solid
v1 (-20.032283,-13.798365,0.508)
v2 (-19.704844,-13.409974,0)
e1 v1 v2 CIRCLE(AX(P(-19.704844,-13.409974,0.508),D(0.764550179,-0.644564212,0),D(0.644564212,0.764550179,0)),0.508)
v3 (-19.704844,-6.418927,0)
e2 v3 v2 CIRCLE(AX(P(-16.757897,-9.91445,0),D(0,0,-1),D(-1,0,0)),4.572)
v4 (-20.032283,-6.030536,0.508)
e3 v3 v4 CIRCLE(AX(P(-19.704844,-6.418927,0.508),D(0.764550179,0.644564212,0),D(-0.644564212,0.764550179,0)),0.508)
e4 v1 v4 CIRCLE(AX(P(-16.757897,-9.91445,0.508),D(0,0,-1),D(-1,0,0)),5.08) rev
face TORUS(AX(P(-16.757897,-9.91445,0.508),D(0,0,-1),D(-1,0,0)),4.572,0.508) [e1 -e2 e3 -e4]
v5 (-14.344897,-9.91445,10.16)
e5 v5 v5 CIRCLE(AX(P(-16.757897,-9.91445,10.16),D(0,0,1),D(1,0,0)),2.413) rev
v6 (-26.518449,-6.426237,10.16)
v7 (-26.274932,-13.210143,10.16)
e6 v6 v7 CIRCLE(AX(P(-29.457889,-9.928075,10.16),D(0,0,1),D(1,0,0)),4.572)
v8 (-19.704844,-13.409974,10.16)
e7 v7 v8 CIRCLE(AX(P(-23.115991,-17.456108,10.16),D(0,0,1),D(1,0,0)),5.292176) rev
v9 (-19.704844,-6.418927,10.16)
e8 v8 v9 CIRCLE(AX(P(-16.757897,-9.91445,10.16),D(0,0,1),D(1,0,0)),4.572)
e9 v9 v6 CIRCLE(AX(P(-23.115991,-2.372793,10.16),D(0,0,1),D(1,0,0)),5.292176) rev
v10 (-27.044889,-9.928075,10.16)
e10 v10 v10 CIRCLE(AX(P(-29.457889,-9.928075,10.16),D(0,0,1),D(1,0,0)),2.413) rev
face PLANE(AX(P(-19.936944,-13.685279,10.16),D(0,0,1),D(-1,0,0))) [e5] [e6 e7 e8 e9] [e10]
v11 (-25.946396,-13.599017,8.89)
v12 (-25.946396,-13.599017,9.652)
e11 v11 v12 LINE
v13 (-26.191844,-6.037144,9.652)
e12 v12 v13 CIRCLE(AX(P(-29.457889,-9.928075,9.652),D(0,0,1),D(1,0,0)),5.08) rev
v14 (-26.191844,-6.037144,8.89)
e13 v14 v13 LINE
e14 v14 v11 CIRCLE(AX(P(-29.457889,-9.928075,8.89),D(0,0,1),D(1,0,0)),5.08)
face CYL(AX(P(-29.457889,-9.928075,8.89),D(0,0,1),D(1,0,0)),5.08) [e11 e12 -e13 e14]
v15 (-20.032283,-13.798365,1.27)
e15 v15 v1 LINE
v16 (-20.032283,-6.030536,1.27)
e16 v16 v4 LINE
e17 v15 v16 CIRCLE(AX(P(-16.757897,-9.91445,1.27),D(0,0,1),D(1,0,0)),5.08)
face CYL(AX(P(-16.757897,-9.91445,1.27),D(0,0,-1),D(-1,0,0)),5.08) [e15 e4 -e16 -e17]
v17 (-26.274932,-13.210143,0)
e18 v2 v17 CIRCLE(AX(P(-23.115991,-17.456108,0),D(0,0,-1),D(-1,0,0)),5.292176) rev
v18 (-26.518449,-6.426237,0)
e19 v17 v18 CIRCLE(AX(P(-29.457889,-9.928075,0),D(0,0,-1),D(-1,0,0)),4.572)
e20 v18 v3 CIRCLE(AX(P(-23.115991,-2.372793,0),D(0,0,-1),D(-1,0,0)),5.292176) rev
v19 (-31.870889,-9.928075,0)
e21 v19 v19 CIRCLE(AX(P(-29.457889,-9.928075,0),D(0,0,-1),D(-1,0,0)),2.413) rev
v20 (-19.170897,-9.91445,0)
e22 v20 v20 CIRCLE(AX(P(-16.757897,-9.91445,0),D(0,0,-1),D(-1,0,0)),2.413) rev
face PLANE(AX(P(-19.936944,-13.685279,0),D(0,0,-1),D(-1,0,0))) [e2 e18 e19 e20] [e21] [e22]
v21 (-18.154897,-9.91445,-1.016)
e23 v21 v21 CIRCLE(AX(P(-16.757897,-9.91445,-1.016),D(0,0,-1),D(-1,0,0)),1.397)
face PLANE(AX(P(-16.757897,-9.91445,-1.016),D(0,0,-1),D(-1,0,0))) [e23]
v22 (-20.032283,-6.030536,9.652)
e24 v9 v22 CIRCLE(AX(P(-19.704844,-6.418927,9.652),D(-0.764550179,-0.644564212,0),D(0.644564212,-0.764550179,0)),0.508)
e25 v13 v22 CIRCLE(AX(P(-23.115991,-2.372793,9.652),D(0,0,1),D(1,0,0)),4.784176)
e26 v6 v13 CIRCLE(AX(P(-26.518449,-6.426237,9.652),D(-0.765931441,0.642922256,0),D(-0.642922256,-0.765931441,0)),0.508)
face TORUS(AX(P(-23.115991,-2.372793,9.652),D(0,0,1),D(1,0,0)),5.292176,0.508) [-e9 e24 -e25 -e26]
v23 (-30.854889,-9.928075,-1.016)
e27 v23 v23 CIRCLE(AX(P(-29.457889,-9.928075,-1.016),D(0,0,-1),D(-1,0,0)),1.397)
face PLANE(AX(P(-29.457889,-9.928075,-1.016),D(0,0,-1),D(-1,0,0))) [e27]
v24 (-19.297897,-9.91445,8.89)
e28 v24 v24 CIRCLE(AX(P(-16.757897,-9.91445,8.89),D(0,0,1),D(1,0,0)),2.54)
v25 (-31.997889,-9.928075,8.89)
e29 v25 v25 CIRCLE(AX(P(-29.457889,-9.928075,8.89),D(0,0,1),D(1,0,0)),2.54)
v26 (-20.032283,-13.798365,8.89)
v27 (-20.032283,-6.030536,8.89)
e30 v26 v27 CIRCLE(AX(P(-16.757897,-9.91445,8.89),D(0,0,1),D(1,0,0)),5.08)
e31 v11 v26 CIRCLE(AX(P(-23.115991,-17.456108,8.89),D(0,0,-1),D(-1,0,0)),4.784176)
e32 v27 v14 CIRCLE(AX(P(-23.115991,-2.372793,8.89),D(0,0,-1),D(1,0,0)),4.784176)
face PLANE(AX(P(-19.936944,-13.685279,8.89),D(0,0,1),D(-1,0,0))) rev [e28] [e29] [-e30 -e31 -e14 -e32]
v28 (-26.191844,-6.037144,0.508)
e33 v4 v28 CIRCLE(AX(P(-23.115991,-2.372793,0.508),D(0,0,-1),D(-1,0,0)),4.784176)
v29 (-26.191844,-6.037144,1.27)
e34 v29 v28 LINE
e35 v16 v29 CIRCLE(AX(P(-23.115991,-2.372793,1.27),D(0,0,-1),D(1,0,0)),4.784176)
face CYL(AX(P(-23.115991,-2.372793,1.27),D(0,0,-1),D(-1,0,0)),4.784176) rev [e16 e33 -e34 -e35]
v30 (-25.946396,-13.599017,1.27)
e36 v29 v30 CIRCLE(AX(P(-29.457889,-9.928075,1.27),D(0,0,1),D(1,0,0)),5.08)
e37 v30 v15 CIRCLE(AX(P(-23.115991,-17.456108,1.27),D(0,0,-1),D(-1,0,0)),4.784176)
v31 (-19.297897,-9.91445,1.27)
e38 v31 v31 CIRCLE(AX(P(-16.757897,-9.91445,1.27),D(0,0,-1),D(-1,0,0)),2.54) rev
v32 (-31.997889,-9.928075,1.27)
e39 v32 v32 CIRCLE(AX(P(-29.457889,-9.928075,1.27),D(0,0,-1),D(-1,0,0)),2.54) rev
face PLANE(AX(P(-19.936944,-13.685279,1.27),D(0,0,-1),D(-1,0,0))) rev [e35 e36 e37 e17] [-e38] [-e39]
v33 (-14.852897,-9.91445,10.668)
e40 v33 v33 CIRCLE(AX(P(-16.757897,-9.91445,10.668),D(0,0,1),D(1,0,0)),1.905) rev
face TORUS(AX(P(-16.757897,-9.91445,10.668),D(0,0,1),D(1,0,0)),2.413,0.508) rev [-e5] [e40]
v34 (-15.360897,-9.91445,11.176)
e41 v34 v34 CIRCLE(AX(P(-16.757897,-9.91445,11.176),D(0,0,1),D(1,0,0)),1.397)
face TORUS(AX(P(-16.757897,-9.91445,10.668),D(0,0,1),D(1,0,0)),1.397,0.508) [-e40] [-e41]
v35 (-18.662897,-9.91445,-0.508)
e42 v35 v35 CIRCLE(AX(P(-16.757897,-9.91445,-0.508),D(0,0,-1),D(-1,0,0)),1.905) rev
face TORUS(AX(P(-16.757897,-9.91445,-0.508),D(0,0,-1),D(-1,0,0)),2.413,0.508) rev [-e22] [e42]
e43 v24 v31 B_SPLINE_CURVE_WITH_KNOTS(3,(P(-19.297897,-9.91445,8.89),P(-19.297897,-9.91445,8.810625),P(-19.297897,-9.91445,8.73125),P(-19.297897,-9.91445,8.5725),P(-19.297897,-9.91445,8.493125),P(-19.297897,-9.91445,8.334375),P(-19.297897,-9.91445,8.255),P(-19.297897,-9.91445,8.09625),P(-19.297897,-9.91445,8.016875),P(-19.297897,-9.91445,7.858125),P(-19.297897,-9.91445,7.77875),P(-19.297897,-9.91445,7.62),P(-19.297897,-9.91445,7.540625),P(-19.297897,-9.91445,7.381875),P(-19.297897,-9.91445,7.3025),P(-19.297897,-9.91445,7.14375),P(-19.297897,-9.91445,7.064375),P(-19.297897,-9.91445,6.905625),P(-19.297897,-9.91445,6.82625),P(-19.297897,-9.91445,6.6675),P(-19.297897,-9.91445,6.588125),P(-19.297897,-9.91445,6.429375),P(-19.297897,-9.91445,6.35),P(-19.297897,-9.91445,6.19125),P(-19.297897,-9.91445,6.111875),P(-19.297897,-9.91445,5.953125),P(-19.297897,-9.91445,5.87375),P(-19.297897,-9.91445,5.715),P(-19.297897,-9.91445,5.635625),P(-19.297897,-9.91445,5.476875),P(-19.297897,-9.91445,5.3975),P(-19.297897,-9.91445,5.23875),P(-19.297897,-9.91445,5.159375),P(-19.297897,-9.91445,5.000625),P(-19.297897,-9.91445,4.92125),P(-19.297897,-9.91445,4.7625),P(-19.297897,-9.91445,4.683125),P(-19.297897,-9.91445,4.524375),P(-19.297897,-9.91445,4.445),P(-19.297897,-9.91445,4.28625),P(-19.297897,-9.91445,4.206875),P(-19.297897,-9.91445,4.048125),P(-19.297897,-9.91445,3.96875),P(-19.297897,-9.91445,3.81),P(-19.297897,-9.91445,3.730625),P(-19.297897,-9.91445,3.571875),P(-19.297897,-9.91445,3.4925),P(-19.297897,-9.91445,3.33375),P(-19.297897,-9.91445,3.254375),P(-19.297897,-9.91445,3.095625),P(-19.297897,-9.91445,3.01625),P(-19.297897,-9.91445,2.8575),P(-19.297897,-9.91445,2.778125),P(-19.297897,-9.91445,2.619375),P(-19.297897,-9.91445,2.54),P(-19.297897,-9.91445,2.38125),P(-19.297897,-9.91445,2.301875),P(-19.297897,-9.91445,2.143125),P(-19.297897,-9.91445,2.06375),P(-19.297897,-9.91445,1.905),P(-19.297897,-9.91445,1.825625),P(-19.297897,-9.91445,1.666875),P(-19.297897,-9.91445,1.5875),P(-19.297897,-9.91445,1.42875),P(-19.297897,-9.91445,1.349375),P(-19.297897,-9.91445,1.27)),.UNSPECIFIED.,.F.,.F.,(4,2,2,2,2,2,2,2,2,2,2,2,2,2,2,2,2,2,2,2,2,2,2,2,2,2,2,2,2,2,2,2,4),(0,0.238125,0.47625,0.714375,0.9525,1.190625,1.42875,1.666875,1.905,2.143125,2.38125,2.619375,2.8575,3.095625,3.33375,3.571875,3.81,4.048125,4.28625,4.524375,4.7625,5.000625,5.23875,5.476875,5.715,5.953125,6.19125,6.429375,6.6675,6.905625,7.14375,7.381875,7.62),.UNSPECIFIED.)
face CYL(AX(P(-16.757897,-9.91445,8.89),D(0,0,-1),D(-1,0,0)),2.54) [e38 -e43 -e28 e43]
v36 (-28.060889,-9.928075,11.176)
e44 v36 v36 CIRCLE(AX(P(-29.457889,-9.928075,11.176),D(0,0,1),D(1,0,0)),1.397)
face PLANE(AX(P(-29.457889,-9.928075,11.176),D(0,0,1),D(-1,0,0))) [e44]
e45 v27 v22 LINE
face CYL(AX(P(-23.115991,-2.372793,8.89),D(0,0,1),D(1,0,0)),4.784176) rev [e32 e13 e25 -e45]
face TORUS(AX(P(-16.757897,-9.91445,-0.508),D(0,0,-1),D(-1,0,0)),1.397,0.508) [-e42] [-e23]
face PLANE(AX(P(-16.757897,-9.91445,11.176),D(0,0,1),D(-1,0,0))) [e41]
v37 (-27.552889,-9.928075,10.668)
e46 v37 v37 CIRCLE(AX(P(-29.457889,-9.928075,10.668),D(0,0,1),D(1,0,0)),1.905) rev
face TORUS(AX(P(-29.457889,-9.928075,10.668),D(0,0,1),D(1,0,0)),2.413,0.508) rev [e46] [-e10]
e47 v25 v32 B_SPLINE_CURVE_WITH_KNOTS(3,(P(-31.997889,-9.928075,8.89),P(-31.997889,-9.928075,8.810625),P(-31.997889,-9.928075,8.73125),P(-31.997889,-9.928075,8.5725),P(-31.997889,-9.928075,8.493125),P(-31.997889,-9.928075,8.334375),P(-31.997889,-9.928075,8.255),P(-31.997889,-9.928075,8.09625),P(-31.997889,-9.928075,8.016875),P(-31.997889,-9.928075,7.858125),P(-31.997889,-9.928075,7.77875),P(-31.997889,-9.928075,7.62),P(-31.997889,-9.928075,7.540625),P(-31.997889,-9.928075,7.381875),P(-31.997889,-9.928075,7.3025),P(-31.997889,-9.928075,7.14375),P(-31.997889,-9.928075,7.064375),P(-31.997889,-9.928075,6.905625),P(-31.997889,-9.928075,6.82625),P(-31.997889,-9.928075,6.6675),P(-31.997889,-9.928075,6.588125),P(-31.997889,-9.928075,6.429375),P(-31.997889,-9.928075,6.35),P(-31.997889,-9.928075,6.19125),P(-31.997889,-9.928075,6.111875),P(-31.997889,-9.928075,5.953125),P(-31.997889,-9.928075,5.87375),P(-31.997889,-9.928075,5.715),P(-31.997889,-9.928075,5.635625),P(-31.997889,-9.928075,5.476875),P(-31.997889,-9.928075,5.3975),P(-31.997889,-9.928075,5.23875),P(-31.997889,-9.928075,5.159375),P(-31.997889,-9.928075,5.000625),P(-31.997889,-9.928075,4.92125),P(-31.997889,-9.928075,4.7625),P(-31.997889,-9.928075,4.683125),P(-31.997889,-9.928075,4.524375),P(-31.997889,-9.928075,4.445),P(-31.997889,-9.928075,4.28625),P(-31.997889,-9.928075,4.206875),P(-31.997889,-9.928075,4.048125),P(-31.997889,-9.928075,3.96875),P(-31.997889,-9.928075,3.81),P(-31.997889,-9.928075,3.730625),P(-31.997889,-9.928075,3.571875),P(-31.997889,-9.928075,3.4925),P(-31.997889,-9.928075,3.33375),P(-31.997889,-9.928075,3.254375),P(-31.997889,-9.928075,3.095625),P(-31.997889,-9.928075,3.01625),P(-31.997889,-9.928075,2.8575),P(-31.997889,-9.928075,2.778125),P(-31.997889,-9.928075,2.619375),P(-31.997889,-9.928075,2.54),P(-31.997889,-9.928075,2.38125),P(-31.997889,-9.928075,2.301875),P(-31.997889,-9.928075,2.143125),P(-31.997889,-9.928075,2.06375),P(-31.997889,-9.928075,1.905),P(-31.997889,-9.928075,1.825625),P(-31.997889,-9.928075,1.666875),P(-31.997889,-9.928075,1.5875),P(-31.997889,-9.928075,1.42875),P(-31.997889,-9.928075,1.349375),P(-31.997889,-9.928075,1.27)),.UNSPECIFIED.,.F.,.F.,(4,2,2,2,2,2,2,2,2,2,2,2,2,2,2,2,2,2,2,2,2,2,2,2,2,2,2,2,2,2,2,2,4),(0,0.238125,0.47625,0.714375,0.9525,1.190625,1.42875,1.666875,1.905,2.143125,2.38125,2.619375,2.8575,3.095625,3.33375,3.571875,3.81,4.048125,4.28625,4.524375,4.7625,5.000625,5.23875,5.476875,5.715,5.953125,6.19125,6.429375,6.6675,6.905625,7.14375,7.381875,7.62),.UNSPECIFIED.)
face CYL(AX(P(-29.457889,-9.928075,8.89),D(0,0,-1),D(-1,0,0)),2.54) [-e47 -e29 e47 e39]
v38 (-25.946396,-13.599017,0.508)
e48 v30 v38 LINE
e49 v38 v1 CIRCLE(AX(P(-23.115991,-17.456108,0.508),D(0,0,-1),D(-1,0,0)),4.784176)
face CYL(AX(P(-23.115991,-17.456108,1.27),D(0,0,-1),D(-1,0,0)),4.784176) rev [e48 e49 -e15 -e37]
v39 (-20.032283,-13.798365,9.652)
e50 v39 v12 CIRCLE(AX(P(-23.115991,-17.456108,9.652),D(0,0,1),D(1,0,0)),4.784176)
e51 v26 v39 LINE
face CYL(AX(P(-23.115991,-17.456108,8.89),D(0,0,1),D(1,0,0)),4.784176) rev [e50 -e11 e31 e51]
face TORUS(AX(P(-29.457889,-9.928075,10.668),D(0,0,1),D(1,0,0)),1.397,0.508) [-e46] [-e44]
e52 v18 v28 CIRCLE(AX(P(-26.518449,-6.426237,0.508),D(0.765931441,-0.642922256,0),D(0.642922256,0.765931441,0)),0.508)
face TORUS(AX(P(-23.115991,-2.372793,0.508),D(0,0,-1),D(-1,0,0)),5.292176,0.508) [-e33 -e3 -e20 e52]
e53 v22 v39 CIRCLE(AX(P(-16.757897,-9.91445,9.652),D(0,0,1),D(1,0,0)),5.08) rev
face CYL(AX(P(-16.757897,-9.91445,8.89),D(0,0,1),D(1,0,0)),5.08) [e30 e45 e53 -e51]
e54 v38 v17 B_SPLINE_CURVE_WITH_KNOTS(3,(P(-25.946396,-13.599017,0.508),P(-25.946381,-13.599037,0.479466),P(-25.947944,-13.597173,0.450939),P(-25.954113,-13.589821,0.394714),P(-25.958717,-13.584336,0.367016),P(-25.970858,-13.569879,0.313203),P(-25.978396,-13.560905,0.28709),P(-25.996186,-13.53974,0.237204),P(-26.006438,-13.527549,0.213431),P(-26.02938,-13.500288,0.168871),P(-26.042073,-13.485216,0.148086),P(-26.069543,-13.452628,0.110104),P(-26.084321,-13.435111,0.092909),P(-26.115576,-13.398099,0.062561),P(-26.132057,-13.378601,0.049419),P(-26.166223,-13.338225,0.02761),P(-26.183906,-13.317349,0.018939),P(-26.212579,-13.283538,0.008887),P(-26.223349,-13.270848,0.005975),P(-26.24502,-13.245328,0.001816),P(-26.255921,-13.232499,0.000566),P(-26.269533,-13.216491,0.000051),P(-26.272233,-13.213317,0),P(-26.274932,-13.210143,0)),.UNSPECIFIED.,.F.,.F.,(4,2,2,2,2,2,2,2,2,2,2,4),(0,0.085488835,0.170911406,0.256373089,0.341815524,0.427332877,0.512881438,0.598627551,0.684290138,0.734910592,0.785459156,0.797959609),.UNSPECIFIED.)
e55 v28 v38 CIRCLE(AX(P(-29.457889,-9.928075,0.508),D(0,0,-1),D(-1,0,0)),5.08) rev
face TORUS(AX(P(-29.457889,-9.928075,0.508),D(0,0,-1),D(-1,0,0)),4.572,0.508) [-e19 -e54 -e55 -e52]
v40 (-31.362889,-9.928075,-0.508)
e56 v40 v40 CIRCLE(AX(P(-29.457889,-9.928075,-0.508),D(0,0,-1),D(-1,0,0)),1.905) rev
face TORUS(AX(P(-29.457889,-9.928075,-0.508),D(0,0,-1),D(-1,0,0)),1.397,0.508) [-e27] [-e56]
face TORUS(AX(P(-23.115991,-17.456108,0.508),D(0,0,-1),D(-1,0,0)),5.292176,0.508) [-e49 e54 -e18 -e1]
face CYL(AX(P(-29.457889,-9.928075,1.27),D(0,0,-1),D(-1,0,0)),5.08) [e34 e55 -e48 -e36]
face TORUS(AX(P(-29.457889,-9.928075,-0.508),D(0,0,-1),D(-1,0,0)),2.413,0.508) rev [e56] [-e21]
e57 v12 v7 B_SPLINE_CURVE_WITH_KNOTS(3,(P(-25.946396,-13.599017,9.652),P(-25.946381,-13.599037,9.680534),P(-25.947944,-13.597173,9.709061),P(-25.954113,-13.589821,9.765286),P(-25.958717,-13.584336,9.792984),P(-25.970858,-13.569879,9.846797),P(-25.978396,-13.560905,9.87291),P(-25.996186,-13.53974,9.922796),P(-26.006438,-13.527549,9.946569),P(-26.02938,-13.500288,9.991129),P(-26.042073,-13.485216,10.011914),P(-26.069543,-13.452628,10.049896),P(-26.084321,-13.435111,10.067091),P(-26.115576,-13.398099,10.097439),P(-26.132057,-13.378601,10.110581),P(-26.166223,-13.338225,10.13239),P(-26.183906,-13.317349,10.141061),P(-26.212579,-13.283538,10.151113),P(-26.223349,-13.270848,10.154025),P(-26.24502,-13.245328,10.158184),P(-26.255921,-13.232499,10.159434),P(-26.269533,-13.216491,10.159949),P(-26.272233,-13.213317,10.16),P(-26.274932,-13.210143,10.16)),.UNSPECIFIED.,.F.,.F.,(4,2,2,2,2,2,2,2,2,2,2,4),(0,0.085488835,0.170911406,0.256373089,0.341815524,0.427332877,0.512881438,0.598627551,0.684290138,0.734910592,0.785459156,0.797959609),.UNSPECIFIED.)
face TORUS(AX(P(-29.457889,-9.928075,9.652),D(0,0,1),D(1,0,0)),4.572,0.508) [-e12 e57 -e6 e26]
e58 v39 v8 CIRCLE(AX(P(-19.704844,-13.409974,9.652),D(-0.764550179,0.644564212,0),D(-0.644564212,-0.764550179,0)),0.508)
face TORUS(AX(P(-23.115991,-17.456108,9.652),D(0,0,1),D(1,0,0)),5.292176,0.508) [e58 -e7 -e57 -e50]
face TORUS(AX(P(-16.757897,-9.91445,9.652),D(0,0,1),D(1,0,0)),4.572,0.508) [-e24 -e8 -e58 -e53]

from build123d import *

# Parameters (mm, degrees)
BOSS_EXTRUDE1_DEPTH  = 1.27
SKETCH2_R            = 2.54
BOSS_EXTRUDE2_DEPTH  = 7.62
SKETCH3_R            = 1.905
BOSS_EXTRUDE3_DEPTH  = 1.016
FILLET1_R            = 0.508
FILLET2_R            = 0.508
FILLET1_OF_MIRROR3_R = 0.508
FILLET2_OF_MIRROR3_R = 0.508


with BuildPart() as part:
    # Sketch1 → Boss-Extrude1 (new body)
    with BuildSketch(Plane.XY):
        with BuildLine():
            ThreePointArc((-26.191844276, -6.037143701), (-34.535215397, -10.092878556), (-25.946396087, -13.599017422))
            ThreePointArc((-25.946396087, -13.599017422), (-22.954821865, -12.674647532), (-20.032282841, -13.798365326))
            ThreePointArc((-20.032282841, -13.798365326), (-11.677896645, -9.914450414), (-20.032282841, -6.030535502))
            ThreePointArc((-20.032282841, -6.030535502), (-23.110858628, -7.156966052), (-26.191844276, -6.037143701))
        make_face()
    boss_extrude1 = extrude(amount=BOSS_EXTRUDE1_DEPTH)

    # Sketch2 → Boss-Extrude2 (add)
    with BuildSketch(Plane.XY.offset(1.27)):
        with Locations(Location((-16.757896645, -9.914450414, 0), (0, 0, 180))):
            Circle(SKETCH2_R)
        with Locations(Location((-29.457889337, -9.928075423, 0), (0, 0, 180))):
            Circle(SKETCH2_R)
    extrude(amount=BOSS_EXTRUDE2_DEPTH)

    # Mirror1: Boss-Extrude1 across plane
    add(boss_extrude1.mirror(Plane.XY.offset(5.08)))

    # Sketch3 → Boss-Extrude3 (add)
    with BuildSketch(Plane(origin=(0, 0, 0), x_dir=(-1, 0, 0), z_dir=(0, 0, -1))):
        with Locations((29.457889337, -9.928075423)):
            Circle(SKETCH3_R)
        with Locations((16.757896645, -9.914450414)):
            Circle(SKETCH3_R)
    boss_extrude3 = extrude(amount=BOSS_EXTRUDE3_DEPTH)

    # Fillet1
    fillet1_edges = [part.edges().sort_by_distance(p)[0] for p in [
        (-27.552889337, -9.928075423, -1.016),
        (-14.852896645, -9.914450414, -1.016),
    ]]
    fillet(fillet1_edges, radius=FILLET1_R)

    # Fillet2
    fillet2_edges = [part.edges().sort_by_distance(p)[0] for p in [
        (-27.552889337, -9.928075423, 0),
    ]]
    fillet(fillet2_edges, radius=FILLET2_R - 0.0001)  # a hair under: the kernel refuses the full size
    fillet2_2_edges = [part.edges().sort_by_distance(p)[0] for p in [
        (-23.110858628, -7.156966052, 0),
        (-11.677896645, -9.914450414, 0),
        (-34.535215397, -10.092878556, 0),
        (-22.954821865, -12.674647532, 0),
    ]]
    fillet(fillet2_2_edges, radius=FILLET2_R)
    fillet2_3_edges = [part.edges().sort_by_distance(p)[0] for p in [
        (-14.852896645, -9.914450414, 0),
    ]]
    fillet(fillet2_3_edges, radius=FILLET2_R - 0.0001)  # a hair under: the kernel refuses the full size
    fillet2_4_edges = [part.edges().sort_by_distance(p)[0] for p in [
        (-23.110858628, -7.156966052, 10.16),
        (-11.677896645, -9.914450414, 10.16),
        (-34.535215397, -10.092878556, 10.16),
        (-22.954821865, -12.674647532, 10.16),
    ]]
    fillet(fillet2_4_edges, radius=FILLET2_R)

    # Mirror3: Boss-Extrude3 across plane
    add(boss_extrude3.mirror(Plane.XY.offset(5.08)))

    # Fillet1 of Mirror3
    fillet1_of_mirror3_edges = [part.edges().sort_by_distance(p)[0] for p in [
        (-27.552889337, -9.928075423, 11.176),
        (-14.852896645, -9.914450414, 11.176),
    ]]
    fillet(fillet1_of_mirror3_edges, radius=FILLET1_OF_MIRROR3_R)

    # Fillet2 of Mirror3
    fillet2_of_mirror3_edges = [part.edges().sort_by_distance(p)[0] for p in [
        (-27.552889337, -9.928075423, 10.16),
    ]]
    fillet(fillet2_of_mirror3_edges, radius=FILLET2_OF_MIRROR3_R - 0.0001)  # a hair under: the kernel refuses the full size
    fillet2_of_mirror3_2_edges = [part.edges().sort_by_distance(p)[0] for p in [
        (-14.852896645, -9.914450414, 10.16),
    ]]
    fillet(fillet2_of_mirror3_2_edges, radius=FILLET2_OF_MIRROR3_R - 0.0001)  # a hair under: the kernel refuses the full size


solid = part.part
